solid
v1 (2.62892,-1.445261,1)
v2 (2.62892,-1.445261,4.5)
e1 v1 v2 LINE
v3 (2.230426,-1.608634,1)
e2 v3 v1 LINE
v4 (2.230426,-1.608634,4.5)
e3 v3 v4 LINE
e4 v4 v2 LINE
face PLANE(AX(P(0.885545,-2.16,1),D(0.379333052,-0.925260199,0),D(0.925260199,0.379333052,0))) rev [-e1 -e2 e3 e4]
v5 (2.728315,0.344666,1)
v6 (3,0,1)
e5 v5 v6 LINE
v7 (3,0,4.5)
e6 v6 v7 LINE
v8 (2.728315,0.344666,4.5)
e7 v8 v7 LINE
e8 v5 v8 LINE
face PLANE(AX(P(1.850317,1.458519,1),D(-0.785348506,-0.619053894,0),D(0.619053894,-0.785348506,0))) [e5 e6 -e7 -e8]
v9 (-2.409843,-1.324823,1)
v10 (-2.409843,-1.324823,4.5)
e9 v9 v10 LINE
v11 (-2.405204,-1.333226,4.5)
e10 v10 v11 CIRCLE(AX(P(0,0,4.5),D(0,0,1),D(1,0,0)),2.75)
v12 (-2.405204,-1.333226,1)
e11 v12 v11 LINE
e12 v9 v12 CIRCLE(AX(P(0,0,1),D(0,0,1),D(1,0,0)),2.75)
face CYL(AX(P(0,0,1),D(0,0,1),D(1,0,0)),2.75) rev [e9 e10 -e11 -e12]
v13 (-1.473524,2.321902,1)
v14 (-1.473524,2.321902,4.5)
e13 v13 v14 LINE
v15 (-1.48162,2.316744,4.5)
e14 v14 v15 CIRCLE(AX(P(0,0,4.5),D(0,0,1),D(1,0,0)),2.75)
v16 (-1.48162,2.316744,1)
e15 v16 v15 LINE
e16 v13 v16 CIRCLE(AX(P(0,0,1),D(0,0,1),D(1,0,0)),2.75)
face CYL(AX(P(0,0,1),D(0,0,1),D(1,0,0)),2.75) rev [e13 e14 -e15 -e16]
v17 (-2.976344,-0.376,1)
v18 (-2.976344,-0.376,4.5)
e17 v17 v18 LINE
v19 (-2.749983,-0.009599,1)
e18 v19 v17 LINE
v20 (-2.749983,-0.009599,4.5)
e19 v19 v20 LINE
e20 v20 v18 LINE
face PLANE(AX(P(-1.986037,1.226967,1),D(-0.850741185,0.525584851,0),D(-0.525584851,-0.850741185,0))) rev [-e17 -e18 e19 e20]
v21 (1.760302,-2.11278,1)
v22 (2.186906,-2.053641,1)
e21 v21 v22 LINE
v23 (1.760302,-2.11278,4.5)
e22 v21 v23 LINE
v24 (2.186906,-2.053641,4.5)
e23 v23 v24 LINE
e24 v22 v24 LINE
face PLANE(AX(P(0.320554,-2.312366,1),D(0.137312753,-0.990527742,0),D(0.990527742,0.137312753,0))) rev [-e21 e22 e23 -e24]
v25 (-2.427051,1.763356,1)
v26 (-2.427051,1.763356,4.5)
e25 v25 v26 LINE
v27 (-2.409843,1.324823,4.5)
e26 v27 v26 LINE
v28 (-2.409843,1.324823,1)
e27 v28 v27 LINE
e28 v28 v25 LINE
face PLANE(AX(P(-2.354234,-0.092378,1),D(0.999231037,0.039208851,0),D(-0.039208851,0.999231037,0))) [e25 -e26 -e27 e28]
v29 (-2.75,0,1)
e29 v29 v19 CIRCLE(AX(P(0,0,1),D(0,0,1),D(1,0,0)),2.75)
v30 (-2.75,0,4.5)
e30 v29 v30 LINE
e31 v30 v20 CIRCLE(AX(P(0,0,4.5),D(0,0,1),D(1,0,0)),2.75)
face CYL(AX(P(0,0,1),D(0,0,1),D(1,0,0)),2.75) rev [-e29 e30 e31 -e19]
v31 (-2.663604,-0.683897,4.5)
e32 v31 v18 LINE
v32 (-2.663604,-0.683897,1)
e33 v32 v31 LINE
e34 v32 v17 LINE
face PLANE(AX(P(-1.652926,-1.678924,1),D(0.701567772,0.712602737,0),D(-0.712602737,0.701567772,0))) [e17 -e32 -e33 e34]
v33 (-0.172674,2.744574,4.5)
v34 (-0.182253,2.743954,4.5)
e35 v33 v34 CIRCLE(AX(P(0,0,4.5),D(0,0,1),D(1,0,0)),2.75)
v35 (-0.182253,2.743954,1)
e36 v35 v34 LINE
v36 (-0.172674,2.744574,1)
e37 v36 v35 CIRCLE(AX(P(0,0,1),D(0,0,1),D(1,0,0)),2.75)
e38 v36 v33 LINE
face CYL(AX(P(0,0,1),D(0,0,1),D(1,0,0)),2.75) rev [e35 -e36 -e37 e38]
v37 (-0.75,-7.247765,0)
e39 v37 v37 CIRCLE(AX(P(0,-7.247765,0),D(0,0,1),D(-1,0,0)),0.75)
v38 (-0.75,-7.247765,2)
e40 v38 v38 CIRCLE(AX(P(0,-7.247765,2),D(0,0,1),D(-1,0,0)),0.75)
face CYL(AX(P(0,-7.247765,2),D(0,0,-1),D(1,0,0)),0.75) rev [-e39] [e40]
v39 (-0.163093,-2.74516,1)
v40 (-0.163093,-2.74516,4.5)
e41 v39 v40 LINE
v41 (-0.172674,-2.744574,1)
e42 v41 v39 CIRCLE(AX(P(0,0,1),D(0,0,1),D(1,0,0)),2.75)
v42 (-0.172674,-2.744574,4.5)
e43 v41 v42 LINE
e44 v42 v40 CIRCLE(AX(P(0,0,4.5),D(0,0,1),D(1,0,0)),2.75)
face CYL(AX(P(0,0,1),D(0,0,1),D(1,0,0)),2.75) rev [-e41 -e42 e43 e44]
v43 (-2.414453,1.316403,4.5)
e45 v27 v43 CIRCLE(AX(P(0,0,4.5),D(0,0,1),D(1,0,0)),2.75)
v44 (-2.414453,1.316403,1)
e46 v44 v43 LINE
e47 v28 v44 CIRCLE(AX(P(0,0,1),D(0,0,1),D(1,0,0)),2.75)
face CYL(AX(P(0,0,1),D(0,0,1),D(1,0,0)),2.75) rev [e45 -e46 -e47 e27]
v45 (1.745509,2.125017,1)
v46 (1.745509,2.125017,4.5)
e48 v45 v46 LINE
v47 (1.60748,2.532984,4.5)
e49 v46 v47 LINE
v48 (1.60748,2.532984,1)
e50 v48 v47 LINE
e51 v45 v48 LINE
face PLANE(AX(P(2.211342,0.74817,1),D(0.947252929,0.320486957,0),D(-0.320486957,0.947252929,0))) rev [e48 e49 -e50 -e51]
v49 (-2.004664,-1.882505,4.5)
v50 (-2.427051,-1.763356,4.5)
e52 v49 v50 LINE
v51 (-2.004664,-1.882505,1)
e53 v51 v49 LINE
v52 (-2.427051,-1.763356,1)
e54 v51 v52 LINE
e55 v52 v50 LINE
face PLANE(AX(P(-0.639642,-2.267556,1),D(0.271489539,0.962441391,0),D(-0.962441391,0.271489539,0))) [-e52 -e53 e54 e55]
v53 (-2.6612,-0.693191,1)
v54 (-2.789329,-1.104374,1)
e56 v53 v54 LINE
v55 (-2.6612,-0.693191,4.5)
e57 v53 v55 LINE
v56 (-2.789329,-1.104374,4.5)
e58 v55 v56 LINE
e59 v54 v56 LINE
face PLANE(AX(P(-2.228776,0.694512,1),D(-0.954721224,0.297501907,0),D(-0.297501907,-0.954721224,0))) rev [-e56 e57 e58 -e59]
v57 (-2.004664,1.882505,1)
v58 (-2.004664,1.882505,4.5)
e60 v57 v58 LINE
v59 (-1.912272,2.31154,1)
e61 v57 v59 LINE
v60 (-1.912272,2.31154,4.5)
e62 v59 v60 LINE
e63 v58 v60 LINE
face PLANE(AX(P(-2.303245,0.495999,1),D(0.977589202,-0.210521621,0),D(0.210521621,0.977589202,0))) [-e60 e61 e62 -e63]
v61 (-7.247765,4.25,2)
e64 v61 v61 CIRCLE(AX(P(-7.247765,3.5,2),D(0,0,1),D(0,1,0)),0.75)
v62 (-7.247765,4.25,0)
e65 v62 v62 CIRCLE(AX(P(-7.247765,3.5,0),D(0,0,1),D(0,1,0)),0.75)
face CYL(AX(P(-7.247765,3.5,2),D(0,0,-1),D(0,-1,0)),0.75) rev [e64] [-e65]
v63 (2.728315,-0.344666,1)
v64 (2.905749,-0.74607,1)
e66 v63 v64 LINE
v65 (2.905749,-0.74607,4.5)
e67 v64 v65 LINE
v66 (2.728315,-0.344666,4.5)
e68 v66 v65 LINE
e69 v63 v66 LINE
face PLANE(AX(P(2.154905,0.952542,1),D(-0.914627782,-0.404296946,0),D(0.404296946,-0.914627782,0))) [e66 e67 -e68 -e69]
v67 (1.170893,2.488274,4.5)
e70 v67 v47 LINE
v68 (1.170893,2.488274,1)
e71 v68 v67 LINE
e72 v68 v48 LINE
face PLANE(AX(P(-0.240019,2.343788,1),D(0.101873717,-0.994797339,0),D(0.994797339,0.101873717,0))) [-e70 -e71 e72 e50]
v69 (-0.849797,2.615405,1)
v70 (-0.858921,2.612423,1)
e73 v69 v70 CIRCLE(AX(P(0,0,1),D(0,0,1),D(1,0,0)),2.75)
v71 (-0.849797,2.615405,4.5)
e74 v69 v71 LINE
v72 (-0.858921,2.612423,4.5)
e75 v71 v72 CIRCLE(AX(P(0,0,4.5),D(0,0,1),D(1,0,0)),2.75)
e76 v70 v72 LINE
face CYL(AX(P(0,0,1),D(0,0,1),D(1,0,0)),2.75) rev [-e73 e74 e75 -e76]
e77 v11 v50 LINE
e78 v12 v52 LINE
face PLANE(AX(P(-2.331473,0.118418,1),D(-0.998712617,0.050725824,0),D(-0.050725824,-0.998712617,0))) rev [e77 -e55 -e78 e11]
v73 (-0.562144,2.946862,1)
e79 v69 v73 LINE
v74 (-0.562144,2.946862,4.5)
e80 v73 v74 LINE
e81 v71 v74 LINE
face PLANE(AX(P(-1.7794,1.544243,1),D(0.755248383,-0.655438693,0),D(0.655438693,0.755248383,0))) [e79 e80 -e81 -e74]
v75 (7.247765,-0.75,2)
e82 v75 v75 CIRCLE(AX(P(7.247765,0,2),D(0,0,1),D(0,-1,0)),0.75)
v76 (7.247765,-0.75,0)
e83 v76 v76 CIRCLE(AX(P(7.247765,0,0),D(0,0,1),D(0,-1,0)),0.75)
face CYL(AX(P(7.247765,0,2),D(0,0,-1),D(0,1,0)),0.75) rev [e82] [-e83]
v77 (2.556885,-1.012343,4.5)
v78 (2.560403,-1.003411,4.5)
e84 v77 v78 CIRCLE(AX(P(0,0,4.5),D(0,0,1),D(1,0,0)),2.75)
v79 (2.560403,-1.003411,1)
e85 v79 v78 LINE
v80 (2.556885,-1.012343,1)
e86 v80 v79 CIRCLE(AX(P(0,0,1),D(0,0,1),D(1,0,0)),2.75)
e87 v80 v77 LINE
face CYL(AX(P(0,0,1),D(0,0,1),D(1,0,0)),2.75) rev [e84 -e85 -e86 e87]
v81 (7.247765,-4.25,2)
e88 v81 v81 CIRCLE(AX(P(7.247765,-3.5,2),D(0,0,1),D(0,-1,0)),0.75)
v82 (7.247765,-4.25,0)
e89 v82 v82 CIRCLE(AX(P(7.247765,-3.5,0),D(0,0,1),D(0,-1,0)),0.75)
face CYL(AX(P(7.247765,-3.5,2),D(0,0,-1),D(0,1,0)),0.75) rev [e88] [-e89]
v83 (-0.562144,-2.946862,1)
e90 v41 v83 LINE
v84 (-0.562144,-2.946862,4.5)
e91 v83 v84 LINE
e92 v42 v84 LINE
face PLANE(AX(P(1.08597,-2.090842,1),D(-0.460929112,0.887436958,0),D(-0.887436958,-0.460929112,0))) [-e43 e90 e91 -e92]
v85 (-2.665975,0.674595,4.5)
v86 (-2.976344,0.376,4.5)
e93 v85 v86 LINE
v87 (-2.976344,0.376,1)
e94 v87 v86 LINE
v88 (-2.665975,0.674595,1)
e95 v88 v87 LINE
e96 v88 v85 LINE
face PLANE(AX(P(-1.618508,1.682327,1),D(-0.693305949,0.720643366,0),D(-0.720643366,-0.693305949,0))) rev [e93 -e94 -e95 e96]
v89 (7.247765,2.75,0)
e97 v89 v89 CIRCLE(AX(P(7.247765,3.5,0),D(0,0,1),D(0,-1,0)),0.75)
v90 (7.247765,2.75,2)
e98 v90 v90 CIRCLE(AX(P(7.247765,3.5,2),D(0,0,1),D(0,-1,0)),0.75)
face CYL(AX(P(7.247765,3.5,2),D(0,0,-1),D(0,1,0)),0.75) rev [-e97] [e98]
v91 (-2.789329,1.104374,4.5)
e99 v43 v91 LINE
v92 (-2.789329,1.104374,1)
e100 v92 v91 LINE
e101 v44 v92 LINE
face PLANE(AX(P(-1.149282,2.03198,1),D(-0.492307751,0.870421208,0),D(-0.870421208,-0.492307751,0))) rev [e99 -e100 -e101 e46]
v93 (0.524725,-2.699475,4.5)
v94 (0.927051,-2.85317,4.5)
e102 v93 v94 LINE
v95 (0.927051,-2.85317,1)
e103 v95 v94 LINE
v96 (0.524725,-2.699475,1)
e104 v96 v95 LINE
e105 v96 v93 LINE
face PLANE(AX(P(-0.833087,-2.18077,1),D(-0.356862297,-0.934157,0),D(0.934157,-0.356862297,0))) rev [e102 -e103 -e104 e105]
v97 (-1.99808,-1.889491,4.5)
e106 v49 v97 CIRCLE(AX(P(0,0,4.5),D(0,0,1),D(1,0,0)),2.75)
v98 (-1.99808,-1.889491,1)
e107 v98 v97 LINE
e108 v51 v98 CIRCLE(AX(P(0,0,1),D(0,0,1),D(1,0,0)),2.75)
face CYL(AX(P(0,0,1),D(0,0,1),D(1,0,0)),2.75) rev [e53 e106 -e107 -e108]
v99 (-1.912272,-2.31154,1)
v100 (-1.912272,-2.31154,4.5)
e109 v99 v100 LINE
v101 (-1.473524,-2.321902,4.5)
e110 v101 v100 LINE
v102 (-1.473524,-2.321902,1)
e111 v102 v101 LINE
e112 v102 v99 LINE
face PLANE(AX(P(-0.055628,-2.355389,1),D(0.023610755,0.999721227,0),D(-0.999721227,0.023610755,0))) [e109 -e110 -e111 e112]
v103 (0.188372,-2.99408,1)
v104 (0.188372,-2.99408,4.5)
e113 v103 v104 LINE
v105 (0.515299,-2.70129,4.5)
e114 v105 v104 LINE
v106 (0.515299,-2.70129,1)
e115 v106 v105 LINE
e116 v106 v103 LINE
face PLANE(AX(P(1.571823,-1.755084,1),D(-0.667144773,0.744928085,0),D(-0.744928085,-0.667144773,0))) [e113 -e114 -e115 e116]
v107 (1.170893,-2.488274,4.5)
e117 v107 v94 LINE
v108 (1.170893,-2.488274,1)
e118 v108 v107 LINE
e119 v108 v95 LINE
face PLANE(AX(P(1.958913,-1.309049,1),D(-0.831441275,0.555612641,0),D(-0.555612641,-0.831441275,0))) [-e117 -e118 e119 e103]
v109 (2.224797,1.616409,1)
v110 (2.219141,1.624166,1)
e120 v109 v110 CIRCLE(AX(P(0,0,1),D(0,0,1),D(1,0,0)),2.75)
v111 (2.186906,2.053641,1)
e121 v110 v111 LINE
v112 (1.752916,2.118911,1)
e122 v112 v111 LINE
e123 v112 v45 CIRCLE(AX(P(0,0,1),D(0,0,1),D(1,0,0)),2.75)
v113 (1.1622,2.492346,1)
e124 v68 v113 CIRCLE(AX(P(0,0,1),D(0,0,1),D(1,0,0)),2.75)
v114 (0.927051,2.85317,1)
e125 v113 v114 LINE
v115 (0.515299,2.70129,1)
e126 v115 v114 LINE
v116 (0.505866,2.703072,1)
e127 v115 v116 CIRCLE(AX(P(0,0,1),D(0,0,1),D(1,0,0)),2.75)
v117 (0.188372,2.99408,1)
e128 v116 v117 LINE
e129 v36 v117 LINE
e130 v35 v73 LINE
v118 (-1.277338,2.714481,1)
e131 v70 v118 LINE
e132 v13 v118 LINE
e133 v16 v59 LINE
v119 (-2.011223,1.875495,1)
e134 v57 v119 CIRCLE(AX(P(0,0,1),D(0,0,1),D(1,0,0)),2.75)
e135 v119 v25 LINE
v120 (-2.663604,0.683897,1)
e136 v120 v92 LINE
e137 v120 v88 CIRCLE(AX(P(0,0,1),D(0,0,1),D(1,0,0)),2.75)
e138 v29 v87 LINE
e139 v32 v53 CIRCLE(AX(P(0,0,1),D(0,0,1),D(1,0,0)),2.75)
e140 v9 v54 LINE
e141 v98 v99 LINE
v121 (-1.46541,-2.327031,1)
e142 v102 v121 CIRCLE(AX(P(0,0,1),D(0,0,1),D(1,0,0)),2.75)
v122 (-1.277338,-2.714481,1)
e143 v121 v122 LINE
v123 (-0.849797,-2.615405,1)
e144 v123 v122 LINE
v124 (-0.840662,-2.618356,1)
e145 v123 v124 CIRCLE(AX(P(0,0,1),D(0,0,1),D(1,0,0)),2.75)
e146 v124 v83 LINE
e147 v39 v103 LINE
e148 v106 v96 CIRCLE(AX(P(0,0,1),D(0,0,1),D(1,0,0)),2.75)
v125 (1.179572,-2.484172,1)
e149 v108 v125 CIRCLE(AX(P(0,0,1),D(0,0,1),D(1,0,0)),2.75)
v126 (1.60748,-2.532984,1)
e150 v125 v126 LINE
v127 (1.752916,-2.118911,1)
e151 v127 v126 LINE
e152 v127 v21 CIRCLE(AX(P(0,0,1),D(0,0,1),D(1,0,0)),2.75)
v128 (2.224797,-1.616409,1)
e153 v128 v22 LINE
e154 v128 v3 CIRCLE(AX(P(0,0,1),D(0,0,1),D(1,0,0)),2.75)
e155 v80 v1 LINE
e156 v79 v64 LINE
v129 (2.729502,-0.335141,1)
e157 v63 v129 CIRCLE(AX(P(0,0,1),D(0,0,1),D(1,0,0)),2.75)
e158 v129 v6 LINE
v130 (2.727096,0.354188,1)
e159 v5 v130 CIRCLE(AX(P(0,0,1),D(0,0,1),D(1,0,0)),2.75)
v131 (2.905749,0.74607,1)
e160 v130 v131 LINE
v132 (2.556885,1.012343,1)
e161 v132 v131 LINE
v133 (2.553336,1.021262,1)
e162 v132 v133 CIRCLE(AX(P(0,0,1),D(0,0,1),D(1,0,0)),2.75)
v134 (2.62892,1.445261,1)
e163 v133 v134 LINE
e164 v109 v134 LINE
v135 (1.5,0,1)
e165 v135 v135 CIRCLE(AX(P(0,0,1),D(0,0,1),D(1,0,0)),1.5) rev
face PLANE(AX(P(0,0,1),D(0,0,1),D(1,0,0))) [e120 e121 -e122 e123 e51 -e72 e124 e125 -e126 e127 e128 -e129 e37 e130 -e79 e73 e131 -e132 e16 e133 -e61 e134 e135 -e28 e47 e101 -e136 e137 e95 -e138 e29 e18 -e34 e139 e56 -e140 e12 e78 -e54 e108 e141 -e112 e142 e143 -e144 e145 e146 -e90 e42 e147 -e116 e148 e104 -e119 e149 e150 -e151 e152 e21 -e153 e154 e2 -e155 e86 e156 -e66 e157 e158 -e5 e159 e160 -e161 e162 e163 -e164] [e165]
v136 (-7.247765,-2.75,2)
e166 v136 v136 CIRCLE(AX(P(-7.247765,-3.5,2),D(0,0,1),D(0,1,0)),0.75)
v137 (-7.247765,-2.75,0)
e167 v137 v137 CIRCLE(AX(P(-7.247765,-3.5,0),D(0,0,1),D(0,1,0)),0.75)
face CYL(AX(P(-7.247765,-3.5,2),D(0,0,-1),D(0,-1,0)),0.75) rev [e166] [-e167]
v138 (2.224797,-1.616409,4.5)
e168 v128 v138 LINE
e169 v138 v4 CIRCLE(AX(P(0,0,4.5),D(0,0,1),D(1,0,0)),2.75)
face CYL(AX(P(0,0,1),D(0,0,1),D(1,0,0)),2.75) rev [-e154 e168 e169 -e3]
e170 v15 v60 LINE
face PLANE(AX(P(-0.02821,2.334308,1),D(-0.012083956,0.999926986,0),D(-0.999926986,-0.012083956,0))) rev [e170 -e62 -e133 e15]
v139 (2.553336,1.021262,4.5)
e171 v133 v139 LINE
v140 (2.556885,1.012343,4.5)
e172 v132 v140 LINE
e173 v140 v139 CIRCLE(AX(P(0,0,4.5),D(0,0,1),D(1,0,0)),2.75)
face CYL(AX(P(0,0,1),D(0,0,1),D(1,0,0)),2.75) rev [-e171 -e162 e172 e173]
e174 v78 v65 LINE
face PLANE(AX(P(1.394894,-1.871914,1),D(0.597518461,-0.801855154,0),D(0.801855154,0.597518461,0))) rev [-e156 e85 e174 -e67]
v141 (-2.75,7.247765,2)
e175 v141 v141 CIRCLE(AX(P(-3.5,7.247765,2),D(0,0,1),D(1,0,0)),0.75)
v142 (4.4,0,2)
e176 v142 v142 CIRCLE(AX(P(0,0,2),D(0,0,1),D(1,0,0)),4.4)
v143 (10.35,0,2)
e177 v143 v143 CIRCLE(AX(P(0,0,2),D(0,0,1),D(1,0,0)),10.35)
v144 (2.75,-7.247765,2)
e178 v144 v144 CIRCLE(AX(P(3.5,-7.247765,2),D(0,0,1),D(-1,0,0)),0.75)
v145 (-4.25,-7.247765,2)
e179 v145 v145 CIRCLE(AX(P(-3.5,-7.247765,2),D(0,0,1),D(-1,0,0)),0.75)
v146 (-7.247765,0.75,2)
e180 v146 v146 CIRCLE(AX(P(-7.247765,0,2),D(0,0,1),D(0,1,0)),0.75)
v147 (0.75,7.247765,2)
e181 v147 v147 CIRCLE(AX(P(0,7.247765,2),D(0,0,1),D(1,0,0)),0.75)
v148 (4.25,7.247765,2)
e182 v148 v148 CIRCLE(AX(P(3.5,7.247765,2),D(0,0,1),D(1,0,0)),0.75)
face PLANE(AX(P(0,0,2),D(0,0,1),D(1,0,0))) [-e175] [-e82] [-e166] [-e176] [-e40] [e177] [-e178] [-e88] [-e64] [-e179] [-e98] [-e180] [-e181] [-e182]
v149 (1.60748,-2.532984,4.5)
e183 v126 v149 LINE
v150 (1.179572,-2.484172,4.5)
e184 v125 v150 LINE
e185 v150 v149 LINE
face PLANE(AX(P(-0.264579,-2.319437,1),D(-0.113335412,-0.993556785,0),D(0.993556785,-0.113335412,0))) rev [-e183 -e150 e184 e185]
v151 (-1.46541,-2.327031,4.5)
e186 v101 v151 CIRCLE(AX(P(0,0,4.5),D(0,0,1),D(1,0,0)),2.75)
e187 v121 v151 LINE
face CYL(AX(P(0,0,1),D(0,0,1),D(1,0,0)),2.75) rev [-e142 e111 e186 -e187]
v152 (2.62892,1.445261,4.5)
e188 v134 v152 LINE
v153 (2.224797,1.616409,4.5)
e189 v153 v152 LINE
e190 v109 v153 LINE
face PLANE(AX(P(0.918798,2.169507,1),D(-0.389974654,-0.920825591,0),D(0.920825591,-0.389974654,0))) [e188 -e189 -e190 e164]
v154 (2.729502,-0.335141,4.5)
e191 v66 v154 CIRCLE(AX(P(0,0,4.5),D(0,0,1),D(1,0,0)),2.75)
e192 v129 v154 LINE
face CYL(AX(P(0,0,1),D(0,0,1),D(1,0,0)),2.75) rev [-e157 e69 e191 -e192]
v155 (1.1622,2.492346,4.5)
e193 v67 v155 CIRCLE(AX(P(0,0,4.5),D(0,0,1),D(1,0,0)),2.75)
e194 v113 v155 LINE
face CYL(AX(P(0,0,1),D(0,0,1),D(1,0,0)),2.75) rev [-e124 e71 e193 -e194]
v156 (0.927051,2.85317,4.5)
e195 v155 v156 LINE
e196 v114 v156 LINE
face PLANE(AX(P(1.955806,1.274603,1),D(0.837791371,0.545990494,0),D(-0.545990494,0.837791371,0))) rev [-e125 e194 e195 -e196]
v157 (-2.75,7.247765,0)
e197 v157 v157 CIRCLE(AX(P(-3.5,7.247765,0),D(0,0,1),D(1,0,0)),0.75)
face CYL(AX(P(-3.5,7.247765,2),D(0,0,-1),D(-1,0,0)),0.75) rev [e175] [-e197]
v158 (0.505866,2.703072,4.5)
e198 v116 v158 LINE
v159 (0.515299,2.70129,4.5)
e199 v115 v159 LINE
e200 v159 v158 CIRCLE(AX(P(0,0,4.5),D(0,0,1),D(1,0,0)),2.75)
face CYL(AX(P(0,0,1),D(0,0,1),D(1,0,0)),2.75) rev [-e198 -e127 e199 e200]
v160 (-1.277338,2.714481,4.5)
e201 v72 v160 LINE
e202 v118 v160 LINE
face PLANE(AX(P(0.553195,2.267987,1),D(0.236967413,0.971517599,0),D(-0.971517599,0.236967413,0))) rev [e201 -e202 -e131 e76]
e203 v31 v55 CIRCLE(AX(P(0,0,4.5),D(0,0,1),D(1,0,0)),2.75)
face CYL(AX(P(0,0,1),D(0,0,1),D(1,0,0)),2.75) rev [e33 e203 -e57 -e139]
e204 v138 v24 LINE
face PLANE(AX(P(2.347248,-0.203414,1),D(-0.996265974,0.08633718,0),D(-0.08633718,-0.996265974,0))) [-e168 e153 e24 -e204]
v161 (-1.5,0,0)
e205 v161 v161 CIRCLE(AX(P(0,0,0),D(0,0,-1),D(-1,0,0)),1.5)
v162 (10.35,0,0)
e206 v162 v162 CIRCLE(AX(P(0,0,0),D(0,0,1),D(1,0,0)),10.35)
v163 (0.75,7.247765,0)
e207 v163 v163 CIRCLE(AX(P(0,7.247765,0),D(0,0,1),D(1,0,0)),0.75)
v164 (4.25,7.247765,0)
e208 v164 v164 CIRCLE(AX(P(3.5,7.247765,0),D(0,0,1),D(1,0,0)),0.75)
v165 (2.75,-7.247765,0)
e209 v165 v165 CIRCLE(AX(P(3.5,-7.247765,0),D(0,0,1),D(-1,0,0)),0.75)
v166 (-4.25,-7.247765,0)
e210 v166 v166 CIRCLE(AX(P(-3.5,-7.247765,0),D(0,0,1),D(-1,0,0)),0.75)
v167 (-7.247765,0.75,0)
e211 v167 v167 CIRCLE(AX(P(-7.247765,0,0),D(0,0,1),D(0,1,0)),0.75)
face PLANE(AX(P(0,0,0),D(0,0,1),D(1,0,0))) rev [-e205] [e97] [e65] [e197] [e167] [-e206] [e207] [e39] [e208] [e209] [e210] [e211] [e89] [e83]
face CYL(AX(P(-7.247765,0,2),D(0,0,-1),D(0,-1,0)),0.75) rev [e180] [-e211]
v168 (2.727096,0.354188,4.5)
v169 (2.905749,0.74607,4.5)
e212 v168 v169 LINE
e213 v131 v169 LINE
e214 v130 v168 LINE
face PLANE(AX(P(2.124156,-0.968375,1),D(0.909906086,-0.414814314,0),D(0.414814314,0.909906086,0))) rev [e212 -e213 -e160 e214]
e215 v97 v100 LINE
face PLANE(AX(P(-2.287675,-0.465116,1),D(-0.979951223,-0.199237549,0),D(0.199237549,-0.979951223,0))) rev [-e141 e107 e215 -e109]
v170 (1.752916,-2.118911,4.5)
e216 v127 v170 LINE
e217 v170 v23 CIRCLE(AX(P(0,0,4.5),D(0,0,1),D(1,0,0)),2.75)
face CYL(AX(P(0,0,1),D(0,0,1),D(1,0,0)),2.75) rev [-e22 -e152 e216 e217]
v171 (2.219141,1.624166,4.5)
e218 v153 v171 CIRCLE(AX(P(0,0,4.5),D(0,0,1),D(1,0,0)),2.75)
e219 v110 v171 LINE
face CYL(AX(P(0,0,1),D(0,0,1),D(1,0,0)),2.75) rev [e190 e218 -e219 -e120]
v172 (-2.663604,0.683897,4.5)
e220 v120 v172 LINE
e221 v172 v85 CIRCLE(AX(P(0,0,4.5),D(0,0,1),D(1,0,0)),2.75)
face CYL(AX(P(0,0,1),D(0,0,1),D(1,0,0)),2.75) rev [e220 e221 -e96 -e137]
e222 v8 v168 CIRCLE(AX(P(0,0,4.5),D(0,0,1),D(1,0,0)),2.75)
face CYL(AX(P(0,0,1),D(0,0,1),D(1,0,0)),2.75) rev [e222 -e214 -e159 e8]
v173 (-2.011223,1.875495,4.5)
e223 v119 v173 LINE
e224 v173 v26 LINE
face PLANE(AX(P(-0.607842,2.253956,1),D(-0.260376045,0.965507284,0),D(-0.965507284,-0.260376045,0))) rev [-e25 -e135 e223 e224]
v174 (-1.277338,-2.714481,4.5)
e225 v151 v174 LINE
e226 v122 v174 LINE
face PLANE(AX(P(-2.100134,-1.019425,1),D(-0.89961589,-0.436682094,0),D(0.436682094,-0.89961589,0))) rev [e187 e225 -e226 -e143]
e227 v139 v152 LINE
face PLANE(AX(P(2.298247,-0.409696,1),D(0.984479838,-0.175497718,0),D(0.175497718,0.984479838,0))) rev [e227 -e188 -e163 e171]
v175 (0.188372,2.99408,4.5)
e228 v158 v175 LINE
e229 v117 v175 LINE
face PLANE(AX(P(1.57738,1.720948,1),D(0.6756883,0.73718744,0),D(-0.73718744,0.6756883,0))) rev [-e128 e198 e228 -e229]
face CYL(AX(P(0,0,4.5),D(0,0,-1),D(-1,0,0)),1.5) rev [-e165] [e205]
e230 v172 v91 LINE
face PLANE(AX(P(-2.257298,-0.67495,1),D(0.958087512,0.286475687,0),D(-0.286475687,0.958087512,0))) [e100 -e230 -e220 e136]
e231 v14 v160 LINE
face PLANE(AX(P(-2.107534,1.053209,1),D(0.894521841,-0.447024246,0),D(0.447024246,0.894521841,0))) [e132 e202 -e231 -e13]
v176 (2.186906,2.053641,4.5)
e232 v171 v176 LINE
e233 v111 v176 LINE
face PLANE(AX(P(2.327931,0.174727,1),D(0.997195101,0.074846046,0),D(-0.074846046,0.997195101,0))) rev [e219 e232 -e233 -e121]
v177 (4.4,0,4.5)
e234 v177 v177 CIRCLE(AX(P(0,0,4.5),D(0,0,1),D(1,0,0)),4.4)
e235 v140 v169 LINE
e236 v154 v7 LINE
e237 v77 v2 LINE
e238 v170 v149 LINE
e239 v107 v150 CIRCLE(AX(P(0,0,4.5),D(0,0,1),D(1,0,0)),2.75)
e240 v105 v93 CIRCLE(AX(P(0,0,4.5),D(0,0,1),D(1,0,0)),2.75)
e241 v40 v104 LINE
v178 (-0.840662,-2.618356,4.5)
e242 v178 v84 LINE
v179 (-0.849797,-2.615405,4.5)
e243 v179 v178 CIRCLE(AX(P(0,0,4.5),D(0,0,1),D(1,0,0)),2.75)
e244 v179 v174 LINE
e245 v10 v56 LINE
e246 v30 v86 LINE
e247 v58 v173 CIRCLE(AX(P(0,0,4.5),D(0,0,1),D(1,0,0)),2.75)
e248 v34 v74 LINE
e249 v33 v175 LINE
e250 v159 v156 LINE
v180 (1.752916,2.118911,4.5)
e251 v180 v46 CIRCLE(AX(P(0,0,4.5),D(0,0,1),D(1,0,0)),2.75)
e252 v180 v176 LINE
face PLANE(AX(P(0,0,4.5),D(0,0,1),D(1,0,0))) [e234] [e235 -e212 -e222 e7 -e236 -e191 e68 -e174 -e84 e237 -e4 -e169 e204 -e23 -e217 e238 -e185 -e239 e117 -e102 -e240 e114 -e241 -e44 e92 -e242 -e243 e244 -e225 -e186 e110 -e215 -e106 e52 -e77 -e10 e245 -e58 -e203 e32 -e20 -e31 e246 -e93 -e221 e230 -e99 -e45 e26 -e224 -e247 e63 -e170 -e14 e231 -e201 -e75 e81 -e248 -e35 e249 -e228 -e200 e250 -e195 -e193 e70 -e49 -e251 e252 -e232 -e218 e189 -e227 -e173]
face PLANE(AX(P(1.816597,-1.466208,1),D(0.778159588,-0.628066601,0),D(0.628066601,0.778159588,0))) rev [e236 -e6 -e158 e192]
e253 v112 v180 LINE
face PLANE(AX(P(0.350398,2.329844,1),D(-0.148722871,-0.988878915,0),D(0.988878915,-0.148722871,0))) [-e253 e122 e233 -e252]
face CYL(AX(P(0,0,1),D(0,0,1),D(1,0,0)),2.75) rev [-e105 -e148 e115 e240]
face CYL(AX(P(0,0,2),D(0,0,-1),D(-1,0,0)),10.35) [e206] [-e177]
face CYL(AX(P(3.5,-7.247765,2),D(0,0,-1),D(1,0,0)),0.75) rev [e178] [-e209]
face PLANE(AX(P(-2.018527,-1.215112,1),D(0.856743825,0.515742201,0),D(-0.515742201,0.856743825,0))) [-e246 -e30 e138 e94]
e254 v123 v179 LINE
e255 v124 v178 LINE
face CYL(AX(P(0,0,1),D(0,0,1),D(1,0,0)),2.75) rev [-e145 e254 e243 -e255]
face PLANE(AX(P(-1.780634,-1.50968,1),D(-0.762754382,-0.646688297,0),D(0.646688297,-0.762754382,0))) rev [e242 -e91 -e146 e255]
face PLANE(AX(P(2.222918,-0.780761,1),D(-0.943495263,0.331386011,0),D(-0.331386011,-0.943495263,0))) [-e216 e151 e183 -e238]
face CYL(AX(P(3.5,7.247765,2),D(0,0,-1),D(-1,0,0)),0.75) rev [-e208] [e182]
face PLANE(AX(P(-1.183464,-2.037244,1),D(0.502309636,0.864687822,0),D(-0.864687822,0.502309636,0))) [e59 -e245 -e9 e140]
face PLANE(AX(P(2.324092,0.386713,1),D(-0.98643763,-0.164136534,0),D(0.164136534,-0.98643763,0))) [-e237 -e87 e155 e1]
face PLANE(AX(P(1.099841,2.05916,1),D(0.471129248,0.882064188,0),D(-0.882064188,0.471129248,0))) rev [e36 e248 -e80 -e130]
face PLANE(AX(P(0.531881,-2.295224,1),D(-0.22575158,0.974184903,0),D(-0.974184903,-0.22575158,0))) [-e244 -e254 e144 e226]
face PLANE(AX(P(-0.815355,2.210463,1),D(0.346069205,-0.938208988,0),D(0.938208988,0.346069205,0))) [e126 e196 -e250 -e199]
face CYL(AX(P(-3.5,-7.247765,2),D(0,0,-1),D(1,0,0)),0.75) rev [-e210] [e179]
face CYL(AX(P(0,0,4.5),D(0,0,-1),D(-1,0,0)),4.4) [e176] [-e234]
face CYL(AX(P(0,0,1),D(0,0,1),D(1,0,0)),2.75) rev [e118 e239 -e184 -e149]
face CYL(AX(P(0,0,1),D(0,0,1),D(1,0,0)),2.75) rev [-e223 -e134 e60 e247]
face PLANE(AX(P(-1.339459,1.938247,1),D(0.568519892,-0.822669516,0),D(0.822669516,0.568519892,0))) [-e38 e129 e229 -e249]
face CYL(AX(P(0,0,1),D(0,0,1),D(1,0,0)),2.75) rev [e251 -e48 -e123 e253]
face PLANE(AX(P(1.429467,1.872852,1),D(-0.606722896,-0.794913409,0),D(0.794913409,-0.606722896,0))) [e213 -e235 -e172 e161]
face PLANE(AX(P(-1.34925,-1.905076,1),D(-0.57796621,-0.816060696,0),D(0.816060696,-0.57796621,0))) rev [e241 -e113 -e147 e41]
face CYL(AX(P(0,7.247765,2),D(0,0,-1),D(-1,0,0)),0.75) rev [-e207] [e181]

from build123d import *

# Parameters (mm, degrees)
SKETCH1_R             = 10.35
SKETCH1_R_2           = 4.4
SKETCH1_R_3           = 0.75
BOSS_EXTRUDE1_DEPTH   = 2
CIRPATTERN2_OUTLINE_R = 0.75
CIRPATTERN2_DEPTH     = 2
SKETCH1_2_R           = 4.4
BOSS_EXTRUDE2_DEPTH   = 4.5
SKETCH2_R             = 1.5
CUT_EXTRUDE1_DEPTH    = 4.5
SKETCH3_R             = 2.75
CUT_EXTRUDE2_DEPTH    = 3.5
CUT_EXTRUDE3_DEPTH    = 3.5
CIRPATTERN1_COUNT     = 25


# Read off the part's stored shape, not the designer's step: CirPattern2
with BuildPart() as part:
    # Sketch1 → Boss-Extrude1 (new body)
    with BuildSketch(Plane.XY):
        Circle(SKETCH1_R)
        Circle(SKETCH1_R_2, mode=Mode.SUBTRACT)
        with Locations((0, 7.247764581)):
            Circle(SKETCH1_R_3, mode=Mode.SUBTRACT)
        with Locations((3.5, 7.247764581)):
            Circle(SKETCH1_R_3, mode=Mode.SUBTRACT)
        with Locations((-3.5, 7.247764581)):
            Circle(SKETCH1_R_3, mode=Mode.SUBTRACT)
    extrude(amount=BOSS_EXTRUDE1_DEPTH)

    # CirPattern2 outline → CirPattern2 (cut)
    with BuildSketch(Plane.XY):
        with Locations((7.247764581, 3.5)):
            Circle(CIRPATTERN2_OUTLINE_R)
        with Locations((7.247764581, 0)):
            Circle(CIRPATTERN2_OUTLINE_R)
        with Locations((7.247764581, -3.5)):
            Circle(CIRPATTERN2_OUTLINE_R)
        with Locations((3.5, -7.247764581)):
            Circle(CIRPATTERN2_OUTLINE_R)
        with Locations((0, -7.247764581)):
            Circle(CIRPATTERN2_OUTLINE_R)
        with Locations((-3.5, -7.247764581)):
            Circle(CIRPATTERN2_OUTLINE_R)
        with Locations((-7.247764581, -3.5)):
            Circle(CIRPATTERN2_OUTLINE_R)
        with Locations((-7.247764581, 0)):
            Circle(CIRPATTERN2_OUTLINE_R)
        with Locations((-7.247764581, 3.5)):
            Circle(CIRPATTERN2_OUTLINE_R)
    extrude(amount=CIRPATTERN2_DEPTH, mode=Mode.SUBTRACT)

    # Sketch1<2> → Boss-Extrude2 (add)
    with BuildSketch(Plane.XY):
        Circle(SKETCH1_2_R)
    extrude(amount=BOSS_EXTRUDE2_DEPTH)

    # Sketch2 → Cut-Extrude1 (cut)
    with BuildSketch(Plane(origin=(0, 0, 0), x_dir=(-1, 0, 0), z_dir=(0, 0, -1))):
        Circle(SKETCH2_R)
    extrude(amount=-CUT_EXTRUDE1_DEPTH, mode=Mode.SUBTRACT)

    # Sketch3 → Cut-Extrude2 (cut)
    with BuildSketch(Plane.XY.offset(4.5)):
        Circle(SKETCH3_R)
    extrude(amount=-CUT_EXTRUDE2_DEPTH, mode=Mode.SUBTRACT)

    # Sketch4 → Cut-Extrude3 (cut)
    with BuildSketch(Plane.XY.offset(4.5)):
        with BuildLine():
            Line((-2.976344104, 0.375999701), (-2.728315429, 0.344666392))
            ThreePointArc((-2.728315429, 0.344666392), (-2.70218519, 0.510583192), (-2.665974712, 0.674595311))
            Line((-2.665974712, 0.674595311), (-2.976344104, 0.375999701))
        make_face()
        with BuildLine():
            Line((-2.976344104, 0.375999701), (-2.75, 0))
            ThreePointArc((-2.75, 0), (-2.744573503, 0.172673929), (-2.728315429, 0.344666392))
            Line((-2.728315429, 0.344666392), (-2.976344104, 0.375999701))
        make_face()
    cut_extrude3 = extrude(amount=-CUT_EXTRUDE3_DEPTH, mode=Mode.SUBTRACT)

    # CirPattern1: Cut-Extrude3 ×25 about axis
    cirpattern1_axis = Axis((0, 0, 0), (0, 0, 1))
    for i in range(1, CIRPATTERN1_COUNT):
        add(cut_extrude3.rotate(cirpattern1_axis, i * 360 / CIRPATTERN1_COUNT), mode=Mode.SUBTRACT)


solid = part.part
